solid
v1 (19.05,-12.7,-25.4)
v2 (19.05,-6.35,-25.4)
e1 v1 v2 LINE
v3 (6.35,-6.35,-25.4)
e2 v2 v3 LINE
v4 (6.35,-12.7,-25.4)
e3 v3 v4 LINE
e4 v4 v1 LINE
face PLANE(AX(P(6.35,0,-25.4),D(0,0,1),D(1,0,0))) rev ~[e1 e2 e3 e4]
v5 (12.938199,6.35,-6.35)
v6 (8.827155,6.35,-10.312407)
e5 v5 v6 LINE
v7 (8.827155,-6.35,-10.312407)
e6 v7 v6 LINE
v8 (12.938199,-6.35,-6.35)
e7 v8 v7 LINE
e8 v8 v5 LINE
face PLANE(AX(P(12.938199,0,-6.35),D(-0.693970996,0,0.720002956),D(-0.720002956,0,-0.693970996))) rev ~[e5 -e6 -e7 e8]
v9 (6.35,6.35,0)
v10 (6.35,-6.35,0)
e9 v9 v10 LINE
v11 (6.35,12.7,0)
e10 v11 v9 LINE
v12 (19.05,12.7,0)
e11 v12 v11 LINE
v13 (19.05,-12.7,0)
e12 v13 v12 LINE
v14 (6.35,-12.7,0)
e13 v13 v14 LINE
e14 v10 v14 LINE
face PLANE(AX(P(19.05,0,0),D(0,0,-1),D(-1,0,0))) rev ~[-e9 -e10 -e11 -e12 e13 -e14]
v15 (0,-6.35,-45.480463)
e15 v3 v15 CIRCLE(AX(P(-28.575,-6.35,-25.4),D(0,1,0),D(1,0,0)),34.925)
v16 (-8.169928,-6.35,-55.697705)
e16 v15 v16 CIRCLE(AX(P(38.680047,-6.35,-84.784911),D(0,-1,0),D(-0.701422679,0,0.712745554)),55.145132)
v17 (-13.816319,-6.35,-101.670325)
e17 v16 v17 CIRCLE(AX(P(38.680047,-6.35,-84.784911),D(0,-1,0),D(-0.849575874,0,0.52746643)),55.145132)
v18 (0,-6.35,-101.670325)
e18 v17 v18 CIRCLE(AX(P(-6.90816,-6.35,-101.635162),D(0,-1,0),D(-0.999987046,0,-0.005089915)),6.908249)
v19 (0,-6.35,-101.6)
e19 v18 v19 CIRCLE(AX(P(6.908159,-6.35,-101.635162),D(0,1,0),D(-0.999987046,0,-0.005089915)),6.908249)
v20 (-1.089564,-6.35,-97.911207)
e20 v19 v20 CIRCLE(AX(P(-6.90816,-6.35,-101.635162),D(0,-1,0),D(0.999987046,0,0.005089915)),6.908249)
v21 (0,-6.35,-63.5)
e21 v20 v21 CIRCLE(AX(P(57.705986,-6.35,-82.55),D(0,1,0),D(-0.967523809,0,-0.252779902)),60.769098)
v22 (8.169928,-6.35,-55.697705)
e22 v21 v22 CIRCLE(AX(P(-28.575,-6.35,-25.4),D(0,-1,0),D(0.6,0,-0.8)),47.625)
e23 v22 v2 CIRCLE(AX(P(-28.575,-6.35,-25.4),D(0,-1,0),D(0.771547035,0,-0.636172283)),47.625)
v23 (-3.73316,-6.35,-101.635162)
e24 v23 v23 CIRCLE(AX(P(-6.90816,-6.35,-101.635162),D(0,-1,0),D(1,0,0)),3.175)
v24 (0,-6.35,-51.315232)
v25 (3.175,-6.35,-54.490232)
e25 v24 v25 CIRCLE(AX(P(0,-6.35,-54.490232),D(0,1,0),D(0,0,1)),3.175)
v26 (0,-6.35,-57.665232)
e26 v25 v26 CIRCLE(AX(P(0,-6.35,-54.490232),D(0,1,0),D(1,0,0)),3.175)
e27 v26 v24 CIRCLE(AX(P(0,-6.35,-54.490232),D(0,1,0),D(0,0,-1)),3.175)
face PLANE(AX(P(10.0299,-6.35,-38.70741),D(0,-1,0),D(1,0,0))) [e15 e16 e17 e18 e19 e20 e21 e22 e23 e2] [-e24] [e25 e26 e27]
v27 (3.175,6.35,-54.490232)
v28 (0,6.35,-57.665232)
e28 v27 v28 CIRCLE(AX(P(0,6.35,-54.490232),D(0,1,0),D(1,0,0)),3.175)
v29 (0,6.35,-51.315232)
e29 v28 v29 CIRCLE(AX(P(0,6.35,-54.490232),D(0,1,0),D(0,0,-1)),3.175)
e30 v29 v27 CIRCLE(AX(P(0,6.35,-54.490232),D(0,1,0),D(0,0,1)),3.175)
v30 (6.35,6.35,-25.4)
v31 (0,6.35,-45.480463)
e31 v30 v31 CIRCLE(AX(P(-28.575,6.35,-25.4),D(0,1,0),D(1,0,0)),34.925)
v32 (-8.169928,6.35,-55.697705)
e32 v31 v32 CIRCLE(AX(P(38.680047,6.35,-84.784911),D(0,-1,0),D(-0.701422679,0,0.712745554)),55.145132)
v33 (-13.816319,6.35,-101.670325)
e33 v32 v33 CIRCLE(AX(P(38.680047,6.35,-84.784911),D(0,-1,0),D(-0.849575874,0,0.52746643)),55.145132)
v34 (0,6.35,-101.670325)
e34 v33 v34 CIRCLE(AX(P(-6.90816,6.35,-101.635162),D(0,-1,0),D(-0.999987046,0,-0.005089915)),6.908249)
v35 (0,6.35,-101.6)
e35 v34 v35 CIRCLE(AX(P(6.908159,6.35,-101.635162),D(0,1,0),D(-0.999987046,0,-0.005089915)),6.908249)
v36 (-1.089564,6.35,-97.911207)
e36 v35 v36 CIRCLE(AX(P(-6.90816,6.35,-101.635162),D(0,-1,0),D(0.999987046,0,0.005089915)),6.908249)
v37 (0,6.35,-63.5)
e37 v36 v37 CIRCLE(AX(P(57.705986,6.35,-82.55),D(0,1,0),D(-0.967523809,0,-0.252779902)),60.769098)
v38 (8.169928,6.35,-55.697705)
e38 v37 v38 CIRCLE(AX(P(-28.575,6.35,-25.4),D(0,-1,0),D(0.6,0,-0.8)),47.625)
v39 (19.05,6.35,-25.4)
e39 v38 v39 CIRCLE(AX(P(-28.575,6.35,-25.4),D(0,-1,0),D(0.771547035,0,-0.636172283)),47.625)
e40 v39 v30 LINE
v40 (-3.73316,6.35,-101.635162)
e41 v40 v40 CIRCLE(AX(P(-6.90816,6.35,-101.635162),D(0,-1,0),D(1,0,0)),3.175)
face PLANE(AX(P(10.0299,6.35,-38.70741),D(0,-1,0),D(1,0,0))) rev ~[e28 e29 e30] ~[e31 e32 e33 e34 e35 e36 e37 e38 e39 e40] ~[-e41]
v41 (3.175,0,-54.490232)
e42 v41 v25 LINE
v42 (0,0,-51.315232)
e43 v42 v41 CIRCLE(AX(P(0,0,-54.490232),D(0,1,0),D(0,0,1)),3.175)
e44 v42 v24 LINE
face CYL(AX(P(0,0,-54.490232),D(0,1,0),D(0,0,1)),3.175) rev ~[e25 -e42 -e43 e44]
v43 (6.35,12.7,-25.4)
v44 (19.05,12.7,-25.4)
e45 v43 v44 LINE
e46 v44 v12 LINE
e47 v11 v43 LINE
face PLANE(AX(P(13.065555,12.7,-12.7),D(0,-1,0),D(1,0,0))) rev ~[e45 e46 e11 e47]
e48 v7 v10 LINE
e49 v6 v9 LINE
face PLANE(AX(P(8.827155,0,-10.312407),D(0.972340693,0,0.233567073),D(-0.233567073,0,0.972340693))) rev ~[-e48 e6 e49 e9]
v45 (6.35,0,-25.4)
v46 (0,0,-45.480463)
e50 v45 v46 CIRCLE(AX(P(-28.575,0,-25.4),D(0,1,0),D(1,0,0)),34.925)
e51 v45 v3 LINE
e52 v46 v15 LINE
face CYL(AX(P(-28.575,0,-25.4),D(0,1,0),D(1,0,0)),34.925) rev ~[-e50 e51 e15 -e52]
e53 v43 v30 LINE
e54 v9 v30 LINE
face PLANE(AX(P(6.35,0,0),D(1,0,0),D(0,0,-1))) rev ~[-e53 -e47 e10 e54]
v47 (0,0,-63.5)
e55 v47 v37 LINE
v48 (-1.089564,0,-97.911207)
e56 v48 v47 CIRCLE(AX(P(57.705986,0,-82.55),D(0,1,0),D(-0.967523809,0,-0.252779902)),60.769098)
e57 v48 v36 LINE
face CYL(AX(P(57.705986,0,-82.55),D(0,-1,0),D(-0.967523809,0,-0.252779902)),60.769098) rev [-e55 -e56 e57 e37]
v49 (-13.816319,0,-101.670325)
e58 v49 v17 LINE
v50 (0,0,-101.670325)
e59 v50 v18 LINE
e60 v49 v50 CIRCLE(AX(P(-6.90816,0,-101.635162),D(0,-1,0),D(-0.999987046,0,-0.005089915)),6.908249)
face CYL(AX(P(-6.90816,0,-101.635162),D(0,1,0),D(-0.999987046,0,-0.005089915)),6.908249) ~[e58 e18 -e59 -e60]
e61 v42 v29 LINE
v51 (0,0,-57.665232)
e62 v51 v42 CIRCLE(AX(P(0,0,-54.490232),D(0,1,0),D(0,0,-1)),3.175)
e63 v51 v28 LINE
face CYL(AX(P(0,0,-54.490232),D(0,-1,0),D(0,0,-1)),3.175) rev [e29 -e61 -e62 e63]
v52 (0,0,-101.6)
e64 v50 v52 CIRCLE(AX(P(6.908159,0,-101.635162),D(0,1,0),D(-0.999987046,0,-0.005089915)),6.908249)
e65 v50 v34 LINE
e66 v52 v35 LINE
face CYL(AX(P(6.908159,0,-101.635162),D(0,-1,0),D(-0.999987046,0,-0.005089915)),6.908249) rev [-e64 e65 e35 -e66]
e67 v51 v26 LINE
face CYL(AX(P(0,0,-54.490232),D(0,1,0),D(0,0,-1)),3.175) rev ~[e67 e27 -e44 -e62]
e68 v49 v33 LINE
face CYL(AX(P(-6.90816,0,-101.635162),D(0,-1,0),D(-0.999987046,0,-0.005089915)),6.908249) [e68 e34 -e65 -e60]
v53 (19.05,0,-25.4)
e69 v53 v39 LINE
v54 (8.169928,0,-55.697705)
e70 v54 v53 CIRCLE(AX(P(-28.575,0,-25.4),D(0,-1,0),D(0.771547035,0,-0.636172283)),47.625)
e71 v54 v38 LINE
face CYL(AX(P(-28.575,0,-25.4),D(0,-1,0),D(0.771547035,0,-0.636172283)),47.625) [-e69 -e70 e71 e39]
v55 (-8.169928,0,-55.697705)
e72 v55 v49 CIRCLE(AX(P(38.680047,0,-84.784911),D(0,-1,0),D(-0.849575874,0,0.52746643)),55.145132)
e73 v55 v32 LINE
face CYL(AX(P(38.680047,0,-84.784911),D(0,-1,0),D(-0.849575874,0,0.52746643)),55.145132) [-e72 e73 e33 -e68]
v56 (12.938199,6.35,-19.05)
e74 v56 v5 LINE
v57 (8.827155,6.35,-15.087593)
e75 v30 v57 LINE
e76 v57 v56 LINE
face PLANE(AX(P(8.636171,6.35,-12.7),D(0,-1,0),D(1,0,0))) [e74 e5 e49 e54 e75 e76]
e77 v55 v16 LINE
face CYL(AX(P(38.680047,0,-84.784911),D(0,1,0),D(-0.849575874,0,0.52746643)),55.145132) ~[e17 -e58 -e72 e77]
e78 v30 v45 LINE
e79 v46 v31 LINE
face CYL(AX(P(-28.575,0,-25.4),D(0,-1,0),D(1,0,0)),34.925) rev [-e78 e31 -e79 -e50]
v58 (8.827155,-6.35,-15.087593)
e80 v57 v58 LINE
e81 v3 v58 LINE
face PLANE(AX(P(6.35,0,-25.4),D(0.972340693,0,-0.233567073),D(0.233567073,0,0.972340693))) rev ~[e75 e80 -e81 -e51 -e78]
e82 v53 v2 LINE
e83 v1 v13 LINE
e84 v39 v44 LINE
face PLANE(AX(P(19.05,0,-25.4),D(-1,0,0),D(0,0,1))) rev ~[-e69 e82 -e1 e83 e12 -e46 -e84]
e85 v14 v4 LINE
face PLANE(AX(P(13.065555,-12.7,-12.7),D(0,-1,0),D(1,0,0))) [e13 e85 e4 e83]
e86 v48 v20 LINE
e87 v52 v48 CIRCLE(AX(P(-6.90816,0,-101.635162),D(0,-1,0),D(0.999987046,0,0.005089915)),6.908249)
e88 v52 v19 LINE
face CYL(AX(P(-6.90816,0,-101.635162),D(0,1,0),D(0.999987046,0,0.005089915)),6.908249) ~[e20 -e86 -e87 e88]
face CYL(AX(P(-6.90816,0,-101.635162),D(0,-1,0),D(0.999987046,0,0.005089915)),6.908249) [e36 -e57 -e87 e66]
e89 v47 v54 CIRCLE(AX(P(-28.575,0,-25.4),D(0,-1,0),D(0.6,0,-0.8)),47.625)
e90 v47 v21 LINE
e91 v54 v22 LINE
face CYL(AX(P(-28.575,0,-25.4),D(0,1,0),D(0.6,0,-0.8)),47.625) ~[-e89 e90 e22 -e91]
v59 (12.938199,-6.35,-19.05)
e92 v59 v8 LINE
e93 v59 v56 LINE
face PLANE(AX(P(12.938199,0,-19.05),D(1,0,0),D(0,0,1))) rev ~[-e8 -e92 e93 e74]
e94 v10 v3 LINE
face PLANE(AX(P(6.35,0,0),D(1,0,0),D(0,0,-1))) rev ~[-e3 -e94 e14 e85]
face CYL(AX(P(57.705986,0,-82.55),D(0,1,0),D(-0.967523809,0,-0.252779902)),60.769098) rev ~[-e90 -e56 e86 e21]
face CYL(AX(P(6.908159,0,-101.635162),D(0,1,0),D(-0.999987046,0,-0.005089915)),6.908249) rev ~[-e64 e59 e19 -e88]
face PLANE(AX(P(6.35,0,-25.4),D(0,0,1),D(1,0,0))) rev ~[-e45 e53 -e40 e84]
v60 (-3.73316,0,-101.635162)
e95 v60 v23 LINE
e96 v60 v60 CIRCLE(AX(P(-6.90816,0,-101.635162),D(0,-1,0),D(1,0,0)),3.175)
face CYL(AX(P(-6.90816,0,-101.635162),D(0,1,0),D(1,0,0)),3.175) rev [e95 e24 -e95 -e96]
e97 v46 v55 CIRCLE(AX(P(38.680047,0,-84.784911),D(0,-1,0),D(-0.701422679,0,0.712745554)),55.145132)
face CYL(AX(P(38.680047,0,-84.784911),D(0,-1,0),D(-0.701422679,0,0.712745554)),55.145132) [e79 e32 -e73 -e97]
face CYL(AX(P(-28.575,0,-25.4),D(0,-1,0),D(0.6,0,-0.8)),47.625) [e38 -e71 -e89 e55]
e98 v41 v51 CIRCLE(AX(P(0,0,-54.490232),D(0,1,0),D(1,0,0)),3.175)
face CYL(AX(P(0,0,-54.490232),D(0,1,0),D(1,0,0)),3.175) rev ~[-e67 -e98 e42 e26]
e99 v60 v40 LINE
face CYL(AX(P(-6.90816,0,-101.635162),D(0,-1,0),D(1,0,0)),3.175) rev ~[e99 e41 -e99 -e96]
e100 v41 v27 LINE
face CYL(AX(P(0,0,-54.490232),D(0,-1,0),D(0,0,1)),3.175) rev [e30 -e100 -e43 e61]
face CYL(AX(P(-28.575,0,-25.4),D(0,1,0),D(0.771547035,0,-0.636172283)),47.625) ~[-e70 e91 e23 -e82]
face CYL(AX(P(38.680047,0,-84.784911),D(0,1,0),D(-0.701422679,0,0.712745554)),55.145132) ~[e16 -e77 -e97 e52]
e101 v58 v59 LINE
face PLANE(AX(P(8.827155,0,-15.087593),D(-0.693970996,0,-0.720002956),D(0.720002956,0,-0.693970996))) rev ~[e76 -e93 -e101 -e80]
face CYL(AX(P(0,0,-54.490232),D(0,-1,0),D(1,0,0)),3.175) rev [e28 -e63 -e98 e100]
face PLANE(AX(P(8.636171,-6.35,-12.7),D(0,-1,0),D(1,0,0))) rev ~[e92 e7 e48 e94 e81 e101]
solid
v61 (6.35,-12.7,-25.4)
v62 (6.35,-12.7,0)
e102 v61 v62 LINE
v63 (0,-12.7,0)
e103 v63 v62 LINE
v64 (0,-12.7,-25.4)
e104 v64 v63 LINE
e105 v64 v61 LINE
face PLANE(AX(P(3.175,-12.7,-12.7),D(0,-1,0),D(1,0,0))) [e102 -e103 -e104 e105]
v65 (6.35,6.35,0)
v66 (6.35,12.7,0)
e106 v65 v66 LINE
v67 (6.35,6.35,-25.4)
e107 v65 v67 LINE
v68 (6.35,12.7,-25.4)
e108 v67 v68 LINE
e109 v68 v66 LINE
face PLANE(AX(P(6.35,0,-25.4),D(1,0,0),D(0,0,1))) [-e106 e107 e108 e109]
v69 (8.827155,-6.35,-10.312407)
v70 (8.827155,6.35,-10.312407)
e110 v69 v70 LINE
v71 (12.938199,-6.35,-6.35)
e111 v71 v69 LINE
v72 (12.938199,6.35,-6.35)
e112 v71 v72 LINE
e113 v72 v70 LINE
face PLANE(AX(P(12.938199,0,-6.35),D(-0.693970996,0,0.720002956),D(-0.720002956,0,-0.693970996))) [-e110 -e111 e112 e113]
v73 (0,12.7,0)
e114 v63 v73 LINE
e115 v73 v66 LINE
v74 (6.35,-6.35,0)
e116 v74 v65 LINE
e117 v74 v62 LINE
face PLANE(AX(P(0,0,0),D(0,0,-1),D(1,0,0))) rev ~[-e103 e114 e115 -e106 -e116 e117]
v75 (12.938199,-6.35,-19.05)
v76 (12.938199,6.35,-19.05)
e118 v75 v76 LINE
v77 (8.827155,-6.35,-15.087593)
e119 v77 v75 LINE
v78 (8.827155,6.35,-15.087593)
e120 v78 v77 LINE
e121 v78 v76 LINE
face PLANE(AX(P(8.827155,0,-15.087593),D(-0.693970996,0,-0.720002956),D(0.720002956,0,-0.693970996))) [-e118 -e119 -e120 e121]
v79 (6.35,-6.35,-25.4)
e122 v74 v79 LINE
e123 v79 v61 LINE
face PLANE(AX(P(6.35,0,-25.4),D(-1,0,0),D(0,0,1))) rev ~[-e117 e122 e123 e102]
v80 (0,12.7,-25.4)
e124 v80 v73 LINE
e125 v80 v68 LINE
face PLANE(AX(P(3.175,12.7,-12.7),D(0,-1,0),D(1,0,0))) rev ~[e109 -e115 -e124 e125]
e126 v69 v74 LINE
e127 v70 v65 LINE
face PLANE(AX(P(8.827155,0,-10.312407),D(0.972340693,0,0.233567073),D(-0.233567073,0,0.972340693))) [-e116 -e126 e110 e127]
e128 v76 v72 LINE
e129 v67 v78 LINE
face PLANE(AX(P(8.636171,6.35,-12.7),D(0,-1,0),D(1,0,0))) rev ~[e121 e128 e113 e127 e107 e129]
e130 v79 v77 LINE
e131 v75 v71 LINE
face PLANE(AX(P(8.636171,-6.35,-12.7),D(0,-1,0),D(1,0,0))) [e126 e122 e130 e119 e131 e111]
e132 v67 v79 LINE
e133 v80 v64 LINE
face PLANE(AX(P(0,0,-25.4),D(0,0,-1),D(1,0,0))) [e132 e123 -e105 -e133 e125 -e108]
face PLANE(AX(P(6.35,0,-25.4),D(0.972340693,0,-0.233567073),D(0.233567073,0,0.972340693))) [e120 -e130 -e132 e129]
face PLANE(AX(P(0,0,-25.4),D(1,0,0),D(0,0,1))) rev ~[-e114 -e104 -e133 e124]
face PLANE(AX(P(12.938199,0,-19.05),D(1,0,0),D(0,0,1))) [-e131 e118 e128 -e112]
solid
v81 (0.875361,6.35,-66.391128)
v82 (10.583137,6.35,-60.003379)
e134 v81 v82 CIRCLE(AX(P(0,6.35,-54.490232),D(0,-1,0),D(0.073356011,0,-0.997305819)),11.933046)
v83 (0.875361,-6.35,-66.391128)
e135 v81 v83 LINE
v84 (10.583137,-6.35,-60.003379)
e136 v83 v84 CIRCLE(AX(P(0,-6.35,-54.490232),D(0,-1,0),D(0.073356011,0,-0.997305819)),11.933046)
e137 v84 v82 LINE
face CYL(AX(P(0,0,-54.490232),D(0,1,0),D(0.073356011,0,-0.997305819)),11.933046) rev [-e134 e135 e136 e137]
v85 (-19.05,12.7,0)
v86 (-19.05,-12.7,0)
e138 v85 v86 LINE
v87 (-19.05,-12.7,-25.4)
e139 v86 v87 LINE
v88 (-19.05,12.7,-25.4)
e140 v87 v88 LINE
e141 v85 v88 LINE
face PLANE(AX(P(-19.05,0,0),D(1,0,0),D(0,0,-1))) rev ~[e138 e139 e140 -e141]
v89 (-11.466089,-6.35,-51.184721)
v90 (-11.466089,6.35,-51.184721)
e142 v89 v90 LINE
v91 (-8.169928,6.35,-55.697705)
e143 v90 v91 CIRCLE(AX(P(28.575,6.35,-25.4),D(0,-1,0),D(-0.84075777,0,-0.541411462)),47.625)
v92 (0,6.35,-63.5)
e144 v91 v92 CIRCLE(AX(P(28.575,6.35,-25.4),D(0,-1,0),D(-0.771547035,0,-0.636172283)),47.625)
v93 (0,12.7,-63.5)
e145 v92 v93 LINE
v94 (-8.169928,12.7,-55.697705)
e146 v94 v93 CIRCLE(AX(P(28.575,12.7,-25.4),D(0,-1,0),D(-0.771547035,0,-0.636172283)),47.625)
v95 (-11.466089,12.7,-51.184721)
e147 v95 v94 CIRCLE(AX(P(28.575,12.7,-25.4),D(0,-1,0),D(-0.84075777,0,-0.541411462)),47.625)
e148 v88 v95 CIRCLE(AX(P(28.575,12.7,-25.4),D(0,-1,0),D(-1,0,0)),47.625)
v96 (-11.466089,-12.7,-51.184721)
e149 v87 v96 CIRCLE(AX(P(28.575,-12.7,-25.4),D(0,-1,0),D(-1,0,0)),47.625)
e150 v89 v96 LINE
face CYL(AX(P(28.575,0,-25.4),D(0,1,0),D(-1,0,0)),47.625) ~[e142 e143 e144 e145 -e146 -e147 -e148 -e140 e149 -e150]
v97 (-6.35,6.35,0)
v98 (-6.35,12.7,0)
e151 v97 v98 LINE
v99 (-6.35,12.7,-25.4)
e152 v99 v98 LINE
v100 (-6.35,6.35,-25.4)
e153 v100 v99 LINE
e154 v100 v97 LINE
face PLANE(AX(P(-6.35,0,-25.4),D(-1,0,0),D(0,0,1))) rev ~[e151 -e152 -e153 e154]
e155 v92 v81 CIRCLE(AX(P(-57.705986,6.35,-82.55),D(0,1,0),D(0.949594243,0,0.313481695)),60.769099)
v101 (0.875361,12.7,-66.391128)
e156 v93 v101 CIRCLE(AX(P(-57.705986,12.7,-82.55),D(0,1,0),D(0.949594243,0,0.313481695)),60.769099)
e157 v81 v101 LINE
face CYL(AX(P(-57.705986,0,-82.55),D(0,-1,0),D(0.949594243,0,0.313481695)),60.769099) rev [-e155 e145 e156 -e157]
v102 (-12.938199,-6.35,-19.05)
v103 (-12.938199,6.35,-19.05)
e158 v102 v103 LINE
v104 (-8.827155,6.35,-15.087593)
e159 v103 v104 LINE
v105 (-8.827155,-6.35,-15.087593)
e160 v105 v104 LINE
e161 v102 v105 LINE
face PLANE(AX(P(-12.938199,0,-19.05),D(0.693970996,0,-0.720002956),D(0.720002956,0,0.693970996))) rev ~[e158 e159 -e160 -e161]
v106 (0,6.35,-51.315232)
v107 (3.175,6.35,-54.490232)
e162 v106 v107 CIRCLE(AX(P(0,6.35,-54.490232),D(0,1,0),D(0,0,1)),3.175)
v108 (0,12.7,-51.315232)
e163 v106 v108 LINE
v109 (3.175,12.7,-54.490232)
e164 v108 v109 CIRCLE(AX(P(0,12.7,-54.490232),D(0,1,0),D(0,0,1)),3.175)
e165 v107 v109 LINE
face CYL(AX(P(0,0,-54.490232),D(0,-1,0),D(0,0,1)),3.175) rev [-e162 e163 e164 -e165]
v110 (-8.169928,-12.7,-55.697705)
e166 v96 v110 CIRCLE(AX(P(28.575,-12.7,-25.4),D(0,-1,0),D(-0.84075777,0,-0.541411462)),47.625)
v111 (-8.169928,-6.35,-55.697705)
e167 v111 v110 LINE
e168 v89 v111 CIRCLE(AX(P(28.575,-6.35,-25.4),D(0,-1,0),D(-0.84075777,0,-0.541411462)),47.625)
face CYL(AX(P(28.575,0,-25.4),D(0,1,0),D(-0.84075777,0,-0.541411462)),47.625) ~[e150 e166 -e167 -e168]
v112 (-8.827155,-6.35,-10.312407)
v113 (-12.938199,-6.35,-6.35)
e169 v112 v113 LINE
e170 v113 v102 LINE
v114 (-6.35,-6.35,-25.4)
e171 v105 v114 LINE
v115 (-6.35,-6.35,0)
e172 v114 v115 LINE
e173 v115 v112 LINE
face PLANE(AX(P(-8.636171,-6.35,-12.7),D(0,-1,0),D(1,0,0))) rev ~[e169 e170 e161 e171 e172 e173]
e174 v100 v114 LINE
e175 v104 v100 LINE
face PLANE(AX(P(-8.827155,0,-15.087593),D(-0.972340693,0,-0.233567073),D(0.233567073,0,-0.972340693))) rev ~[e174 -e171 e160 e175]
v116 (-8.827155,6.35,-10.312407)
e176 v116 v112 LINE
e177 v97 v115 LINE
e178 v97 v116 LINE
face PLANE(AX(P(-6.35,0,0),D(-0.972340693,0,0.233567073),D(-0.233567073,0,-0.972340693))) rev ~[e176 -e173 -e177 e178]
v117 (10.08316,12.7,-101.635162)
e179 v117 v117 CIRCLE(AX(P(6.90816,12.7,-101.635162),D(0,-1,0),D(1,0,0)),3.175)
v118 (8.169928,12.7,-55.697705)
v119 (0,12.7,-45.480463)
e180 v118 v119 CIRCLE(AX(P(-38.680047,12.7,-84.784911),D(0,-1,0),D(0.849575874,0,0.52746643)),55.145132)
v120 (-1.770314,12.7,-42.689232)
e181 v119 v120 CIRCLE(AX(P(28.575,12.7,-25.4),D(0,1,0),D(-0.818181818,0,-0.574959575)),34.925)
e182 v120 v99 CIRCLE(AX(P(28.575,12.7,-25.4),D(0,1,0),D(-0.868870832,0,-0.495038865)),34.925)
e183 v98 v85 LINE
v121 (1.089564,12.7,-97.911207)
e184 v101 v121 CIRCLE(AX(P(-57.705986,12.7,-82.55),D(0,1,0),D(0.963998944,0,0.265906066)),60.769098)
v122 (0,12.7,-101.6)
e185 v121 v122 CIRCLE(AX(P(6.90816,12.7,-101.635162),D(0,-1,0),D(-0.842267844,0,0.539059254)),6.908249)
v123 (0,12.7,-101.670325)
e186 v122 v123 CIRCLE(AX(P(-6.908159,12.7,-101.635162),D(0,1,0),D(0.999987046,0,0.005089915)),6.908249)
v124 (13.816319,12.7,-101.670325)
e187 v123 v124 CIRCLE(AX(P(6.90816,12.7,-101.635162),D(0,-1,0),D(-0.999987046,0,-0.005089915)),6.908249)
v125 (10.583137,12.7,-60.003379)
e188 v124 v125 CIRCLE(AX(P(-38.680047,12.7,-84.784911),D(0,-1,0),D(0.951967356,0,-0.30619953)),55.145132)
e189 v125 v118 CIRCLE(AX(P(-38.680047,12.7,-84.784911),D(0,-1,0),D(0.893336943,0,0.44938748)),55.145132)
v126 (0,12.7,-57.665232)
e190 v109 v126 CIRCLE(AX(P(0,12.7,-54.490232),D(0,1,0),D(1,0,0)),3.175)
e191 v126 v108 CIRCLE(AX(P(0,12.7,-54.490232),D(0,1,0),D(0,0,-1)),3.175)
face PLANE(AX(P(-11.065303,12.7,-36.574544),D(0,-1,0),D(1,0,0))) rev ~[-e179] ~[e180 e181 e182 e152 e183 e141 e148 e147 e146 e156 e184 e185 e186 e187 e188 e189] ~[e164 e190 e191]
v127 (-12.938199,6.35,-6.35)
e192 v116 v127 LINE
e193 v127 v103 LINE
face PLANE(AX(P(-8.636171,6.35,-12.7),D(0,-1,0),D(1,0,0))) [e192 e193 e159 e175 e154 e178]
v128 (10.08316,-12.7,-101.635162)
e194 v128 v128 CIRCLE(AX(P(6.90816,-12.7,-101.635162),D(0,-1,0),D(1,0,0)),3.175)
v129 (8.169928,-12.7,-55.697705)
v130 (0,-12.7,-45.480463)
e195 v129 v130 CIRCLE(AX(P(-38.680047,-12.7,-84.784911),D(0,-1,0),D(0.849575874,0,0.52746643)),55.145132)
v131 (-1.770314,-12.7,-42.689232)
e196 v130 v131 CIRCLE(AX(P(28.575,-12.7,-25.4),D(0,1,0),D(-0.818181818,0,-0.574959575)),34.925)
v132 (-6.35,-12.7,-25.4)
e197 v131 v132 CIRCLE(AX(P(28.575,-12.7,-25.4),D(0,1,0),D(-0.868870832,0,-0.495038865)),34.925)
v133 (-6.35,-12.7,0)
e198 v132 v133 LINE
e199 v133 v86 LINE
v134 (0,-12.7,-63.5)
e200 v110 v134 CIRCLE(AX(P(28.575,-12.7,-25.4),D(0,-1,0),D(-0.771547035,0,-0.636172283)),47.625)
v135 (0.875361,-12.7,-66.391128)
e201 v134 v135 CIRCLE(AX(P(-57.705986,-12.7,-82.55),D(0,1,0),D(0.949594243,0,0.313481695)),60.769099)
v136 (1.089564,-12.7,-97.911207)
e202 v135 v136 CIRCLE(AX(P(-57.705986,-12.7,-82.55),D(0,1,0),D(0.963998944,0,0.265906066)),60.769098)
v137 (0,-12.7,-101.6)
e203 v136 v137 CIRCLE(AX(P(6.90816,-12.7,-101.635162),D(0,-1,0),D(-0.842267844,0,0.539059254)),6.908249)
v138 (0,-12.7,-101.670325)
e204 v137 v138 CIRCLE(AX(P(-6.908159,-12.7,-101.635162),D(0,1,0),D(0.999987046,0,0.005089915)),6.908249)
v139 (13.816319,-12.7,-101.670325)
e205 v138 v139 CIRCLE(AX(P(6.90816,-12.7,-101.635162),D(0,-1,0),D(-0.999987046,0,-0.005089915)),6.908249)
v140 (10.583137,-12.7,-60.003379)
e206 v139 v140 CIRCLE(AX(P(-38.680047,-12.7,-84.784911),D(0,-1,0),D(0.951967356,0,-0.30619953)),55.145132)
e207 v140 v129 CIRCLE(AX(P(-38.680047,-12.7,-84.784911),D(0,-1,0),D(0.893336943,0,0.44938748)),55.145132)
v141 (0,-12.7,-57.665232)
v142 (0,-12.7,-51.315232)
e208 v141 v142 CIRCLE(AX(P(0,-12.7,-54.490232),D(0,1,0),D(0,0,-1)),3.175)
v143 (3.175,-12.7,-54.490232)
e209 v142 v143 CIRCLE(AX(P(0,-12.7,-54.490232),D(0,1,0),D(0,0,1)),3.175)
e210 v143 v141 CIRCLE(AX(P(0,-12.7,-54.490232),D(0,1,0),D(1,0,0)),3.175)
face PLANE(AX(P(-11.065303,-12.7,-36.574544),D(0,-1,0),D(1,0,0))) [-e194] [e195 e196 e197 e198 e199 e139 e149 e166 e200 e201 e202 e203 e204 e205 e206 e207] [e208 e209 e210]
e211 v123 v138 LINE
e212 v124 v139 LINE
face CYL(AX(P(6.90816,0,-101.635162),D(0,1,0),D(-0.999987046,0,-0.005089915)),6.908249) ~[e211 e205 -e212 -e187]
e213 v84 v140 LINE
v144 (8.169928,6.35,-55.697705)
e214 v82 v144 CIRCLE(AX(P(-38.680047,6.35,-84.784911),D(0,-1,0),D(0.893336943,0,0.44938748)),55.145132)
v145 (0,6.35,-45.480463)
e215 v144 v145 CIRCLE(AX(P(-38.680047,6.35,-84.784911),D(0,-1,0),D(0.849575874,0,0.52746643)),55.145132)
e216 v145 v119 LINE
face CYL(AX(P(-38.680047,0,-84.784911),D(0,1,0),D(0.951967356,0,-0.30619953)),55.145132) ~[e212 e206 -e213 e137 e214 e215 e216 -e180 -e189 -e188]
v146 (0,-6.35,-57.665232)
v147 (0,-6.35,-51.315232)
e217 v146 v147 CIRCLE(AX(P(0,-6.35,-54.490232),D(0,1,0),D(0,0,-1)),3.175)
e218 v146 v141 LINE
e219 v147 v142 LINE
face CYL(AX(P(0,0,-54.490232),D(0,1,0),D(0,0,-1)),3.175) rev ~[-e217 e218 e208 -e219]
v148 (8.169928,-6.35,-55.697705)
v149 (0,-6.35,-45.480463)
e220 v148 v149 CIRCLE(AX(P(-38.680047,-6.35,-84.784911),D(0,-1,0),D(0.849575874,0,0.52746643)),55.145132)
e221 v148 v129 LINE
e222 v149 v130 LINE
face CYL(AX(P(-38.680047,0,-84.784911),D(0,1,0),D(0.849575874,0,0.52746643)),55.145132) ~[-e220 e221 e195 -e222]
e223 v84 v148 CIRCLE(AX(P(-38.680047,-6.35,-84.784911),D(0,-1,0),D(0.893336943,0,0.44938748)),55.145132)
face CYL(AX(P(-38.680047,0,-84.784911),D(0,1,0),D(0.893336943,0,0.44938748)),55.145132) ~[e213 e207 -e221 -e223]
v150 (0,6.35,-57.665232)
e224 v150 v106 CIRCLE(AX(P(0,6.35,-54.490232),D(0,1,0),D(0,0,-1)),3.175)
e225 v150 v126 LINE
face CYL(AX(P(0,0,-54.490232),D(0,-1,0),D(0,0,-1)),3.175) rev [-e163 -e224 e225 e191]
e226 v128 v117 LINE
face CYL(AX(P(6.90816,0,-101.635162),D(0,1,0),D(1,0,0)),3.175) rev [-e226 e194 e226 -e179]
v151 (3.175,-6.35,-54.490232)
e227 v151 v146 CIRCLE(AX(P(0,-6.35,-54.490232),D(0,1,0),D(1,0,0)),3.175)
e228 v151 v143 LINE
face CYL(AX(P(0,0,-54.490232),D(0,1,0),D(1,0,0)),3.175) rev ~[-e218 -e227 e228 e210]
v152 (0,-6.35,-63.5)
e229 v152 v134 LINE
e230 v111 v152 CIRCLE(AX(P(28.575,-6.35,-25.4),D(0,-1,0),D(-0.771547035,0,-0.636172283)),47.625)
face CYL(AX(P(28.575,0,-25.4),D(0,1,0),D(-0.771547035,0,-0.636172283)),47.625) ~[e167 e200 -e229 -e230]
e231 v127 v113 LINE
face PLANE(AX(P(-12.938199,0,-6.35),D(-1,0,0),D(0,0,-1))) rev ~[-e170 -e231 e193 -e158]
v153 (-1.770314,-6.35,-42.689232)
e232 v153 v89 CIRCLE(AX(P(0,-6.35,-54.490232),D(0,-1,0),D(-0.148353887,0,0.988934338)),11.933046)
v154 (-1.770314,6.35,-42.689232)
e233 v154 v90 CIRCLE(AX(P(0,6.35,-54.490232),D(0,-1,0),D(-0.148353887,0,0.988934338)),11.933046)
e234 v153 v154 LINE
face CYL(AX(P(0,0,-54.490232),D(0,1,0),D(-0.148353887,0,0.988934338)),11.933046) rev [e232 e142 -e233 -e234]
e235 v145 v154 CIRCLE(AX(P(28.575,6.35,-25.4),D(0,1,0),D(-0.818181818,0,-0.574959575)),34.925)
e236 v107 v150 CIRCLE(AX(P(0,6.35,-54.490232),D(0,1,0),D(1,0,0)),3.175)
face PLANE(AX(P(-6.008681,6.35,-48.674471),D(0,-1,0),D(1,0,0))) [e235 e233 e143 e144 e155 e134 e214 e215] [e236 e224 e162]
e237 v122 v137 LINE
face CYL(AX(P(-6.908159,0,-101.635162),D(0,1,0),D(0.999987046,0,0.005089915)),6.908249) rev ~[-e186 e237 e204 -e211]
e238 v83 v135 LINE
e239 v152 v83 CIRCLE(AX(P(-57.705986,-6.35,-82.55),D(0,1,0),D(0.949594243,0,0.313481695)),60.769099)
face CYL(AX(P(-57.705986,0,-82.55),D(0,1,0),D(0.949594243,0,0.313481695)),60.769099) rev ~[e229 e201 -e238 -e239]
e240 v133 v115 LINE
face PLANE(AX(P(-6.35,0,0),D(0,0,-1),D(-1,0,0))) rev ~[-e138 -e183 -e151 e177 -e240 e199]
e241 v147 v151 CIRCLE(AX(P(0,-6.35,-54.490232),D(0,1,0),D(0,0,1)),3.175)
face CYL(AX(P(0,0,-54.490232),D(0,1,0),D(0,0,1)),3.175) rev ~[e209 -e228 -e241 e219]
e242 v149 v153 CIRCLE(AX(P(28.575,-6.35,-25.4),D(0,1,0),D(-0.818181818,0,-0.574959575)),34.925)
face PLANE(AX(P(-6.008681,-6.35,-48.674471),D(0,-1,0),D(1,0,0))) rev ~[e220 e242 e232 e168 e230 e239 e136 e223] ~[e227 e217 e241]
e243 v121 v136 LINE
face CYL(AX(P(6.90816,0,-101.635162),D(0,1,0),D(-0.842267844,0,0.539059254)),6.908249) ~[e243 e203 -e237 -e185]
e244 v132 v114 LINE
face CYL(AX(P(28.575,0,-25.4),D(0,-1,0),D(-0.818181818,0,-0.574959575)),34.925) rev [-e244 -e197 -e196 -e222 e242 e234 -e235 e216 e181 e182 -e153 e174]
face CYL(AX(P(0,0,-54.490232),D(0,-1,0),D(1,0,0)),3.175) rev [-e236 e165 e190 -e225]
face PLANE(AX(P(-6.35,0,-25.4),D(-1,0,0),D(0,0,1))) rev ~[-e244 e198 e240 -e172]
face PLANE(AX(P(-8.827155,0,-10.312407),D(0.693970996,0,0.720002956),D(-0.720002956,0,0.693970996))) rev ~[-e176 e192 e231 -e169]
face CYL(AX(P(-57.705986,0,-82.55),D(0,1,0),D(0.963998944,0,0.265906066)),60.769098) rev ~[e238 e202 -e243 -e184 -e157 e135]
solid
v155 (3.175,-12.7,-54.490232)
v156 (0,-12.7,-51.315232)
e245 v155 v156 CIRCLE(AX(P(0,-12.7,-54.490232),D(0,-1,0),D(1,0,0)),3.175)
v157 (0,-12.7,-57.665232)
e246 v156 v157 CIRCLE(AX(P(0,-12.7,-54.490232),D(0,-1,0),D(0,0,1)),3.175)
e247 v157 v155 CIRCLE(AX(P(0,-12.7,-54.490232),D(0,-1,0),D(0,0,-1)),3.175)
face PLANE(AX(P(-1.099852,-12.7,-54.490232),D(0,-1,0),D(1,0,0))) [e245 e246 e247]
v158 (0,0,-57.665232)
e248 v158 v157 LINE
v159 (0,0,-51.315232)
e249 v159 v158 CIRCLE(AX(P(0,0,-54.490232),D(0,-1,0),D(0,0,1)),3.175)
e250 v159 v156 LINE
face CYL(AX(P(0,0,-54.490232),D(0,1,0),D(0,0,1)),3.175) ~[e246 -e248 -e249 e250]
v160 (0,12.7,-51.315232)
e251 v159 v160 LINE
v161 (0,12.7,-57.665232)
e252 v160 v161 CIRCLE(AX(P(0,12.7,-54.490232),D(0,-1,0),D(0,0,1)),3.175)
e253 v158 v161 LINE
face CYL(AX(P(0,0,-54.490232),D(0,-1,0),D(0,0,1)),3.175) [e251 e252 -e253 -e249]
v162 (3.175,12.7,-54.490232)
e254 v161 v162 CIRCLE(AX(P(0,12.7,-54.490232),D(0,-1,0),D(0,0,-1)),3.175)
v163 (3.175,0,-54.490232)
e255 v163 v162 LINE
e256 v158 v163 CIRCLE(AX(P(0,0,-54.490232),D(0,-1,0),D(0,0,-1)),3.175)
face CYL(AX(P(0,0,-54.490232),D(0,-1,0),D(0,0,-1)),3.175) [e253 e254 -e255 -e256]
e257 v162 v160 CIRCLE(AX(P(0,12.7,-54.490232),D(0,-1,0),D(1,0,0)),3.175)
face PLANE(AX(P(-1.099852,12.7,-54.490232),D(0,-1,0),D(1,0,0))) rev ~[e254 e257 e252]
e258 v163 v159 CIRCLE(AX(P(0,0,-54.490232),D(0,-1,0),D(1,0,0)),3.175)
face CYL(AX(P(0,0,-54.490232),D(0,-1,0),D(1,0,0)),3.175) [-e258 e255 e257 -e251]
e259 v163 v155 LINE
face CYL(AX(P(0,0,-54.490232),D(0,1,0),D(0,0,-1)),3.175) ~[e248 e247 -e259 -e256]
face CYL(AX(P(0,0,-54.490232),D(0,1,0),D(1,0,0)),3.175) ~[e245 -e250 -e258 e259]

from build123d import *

# Parameters (mm, degrees)
F1_DEPTH      = 12.7
F1_DEPTH_BACK = 12.7
F2_DEPTH      = 6.35
F2_DEPTH_BACK = 6.35
F3_DEPTH      = 6.35
F3_DEPTH_BACK = 6.35
F0_W          = 6.35
F0_H          = 25.4
F4_DEPTH      = 12.7
F4_DEPTH_BACK = 12.7
F0_R          = 3.175
F5_DEPTH      = 6.35
F5_DEPTH_BACK = 6.35
F6_DEPTH      = 12.7
F6_DEPTH_BACK = 12.7
F7_DEPTH      = 6.35
F7_DEPTH_BACK = 6.35
F8_DEPTH      = 12.7
F8_DEPTH_BACK = 12.7


with BuildPart() as f1:
    # F0 (on Front) → F1 (new body, two sides)
    with BuildSketch(Plane.XZ) as f1_sk:
        Polygon((-8.827155169, -10.3124072454), (-6.35, 0), (-19.05, 0), (-19.05, -25.4), (-6.35, -25.4), (-8.827155169, -15.0875927546), (-12.9381986335, -19.05), (-12.9381986335, -12.7), (-12.9381986335, -6.35), align=None)
        Polygon((-6.35, -25.4), (-6.35, 0), (-8.827155169, -10.3124072454), (-12.9381986335, -6.35), (-12.9381986335, -12.7), (-12.9381986335, -19.05), (-8.827155169, -15.0875927546), align=None)
    extrude(amount=-F1_DEPTH)
    extrude(f1_sk.sketch, amount=F1_DEPTH_BACK)


with BuildPart() as f1b:
    # F0 (on Front) → F1, piece 2 (new body, two sides)
    with BuildSketch(Plane.XZ) as f1_2_sk:
        Polygon((19.05, 0), (6.35, 0), (8.827155169, -10.3124072454), (12.9381986335, -6.35), (12.9381986335, -12.7), (12.9381986335, -19.05), (8.827155169, -15.0875927546), (6.35, -25.4), (19.05, -25.4), align=None)
        Polygon((8.827155169, -10.3124072454), (6.35, 0), (6.35, -25.4), (8.827155169, -15.0875927546), (12.9381986335, -19.05), (12.9381986335, -12.7), (12.9381986335, -6.35), align=None)
    extrude(amount=-F1_DEPTH)
    extrude(f1_2_sk.sketch, amount=F1_DEPTH_BACK)


with BuildPart() as f2_tool:
    # F0 (on Front) → F2 (new body, two sides)
    with BuildSketch(Plane.XZ) as f2_sk:
        Polygon((8.827155169, -10.3124072454), (6.35, 0), (6.35, -25.4), (8.827155169, -15.0875927546), (12.9381986335, -19.05), (12.9381986335, -12.7), (12.9381986335, -6.35), align=None)
        Polygon((-6.35, -25.4), (-6.35, 0), (-8.827155169, -10.3124072454), (-12.9381986335, -6.35), (-12.9381986335, -12.7), (-12.9381986335, -19.05), (-8.827155169, -15.0875927546), align=None)
    extrude(amount=F2_DEPTH)
    extrude(f2_sk.sketch, amount=-F2_DEPTH_BACK)


with BuildPart() as f1_1:
    add(f1.part)

    # F2: cut by f2_tool
    add(f2_tool.part, mode=Mode.SUBTRACT)

    # F0 (on Front) → F6 (join, two sides)
    with BuildSketch(Plane.XZ) as f6_sk:
        with BuildLine():
            ThreePointArc((-1.7703138016, -42.6892323508), (-5.1856702357, -34.3427495905), (-6.35, -25.4))
            Line((-6.35, -25.4), (-19.05, -25.4))
            ThreePointArc((-19.05, -25.4), (-17.1147005889, -38.8384480167), (-11.4660888148, -51.1847208929))
            ThreePointArc((-11.4660888148, -51.1847208929), (-7.8640905354, -45.515061734), (-1.7703138016, -42.6892323508))
        make_face()
        with BuildLine():
            ThreePointArc((-8.1699275215, -55.6977049698), (-4.3890156004, -50.3459576296), (0, -45.4804631421))
            ThreePointArc((0, -45.4804631421), (-0.9181956043, -44.1058022562), (-1.7703138016, -42.6892323508))
            ThreePointArc((-1.7703138016, -42.6892323508), (-7.8640905354, -45.515061734), (-11.4660888148, -51.1847208929))
            ThreePointArc((-11.4660888148, -51.1847208929), (-9.8842619862, -53.4896029249), (-8.1699275215, -55.6977049698))
        make_face()
        with BuildLine():
            Line((0, -51.315231571), (0, -45.4804631421))
            ThreePointArc((0, -45.4804631421), (-4.3890156004, -50.3459576296), (-8.1699275215, -55.6977049698))
            ThreePointArc((-8.1699275215, -55.6977049698), (-4.3171295265, -59.8419575549), (0, -63.5))
            Line((0, -63.5), (0, -57.665231571))
            ThreePointArc((0, -57.665231571), (-3.175, -54.490231571), (0, -51.315231571))
        make_face()
        with BuildLine():
            ThreePointArc((8.1699275215, -55.6977049698), (4.3890156004, -50.3459576296), (0, -45.4804631421))
            Line((0, -45.4804631421), (0, -51.315231571))
            ThreePointArc((0, -51.315231571), (2.2450640303, -52.2451675408), (3.175, -54.490231571))
            ThreePointArc((3.175, -54.490231571), (2.2450640303, -56.7352956013), (0, -57.665231571))
            Line((0, -57.665231571), (0, -63.5))
            ThreePointArc((0, -63.5), (4.3171295265, -59.8419575549), (8.1699275215, -55.6977049698))
        make_face()
        with BuildLine():
            ThreePointArc((13.816319406, -101.6703248024), (16.2998142634, -80.5187022847), (10.5831374671, -60.0033790301))
            ThreePointArc((10.5831374671, -60.0033790301), (6.5593543364, -64.4588054029), (0.8753606705, -66.3911280603))
            ThreePointArc((0.8753606705, -66.3911280603), (3.0617092136, -82.1370373381), (1.0895635546, -97.9112067437))
            ThreePointArc((1.0895635546, -97.9112067437), (0.282876498, -99.6782440765), (0, -101.6))
            ThreePointArc((0, -101.6), (8.94874e-05, -101.6351624012), (0, -101.6703248024))
            ThreePointArc((0, -101.6703248024), (6.908159703, -108.5434115916), (13.816319406, -101.6703248024))
        make_face()
        with Locations((6.908159703, -101.6351624012)):
            Circle(F0_R, mode=Mode.SUBTRACT)
        with BuildLine():
            ThreePointArc((10.5831374671, -60.0033790301), (9.424729686, -57.8235288213), (8.1699275215, -55.6977049698))
            ThreePointArc((8.1699275215, -55.6977049698), (4.3171295265, -59.8419575549), (0, -63.5))
            ThreePointArc((0, -63.5), (0.4556473184, -64.9401240807), (0.8753606705, -66.3911280603))
            ThreePointArc((0.8753606705, -66.3911280603), (6.5593543364, -64.4588054029), (10.5831374671, -60.0033790301))
        make_face()
        with BuildLine():
            ThreePointArc((13.816319406, -101.6703248024), (16.2998142634, -80.5187022847), (10.5831374671, -60.0033790301))
            ThreePointArc((10.5831374671, -60.0033790301), (6.5593543364, -64.4588054029), (0.8753606705, -66.3911280603))
            ThreePointArc((0.8753606705, -66.3911280603), (3.0617092136, -82.1370373381), (1.0895635546, -97.9112067437))
            ThreePointArc((1.0895635546, -97.9112067437), (0.282876498, -99.6782440765), (0, -101.6))
            ThreePointArc((0, -101.6), (8.94874e-05, -101.6351624012), (0, -101.6703248024))
            ThreePointArc((0, -101.6703248024), (6.908159703, -108.5434115916), (13.816319406, -101.6703248024))
        make_face()
        with Locations((6.908159703, -101.6351624012)):
            Circle(F0_R, mode=Mode.SUBTRACT)
    extrude(amount=F6_DEPTH)
    extrude(f6_sk.sketch, amount=-F6_DEPTH_BACK)

    # F0 (on Front) → F7 (cut, two sides)
    with BuildSketch(Plane.XZ) as f7_sk:
        with BuildLine():
            ThreePointArc((-8.1699275215, -55.6977049698), (-4.3890156004, -50.3459576296), (0, -45.4804631421))
            ThreePointArc((0, -45.4804631421), (-0.9181956043, -44.1058022562), (-1.7703138016, -42.6892323508))
            ThreePointArc((-1.7703138016, -42.6892323508), (-7.8640905354, -45.515061734), (-11.4660888148, -51.1847208929))
            ThreePointArc((-11.4660888148, -51.1847208929), (-9.8842619862, -53.4896029249), (-8.1699275215, -55.6977049698))
        make_face()
        with BuildLine():
            Line((0, -51.315231571), (0, -45.4804631421))
            ThreePointArc((0, -45.4804631421), (-4.3890156004, -50.3459576296), (-8.1699275215, -55.6977049698))
            ThreePointArc((-8.1699275215, -55.6977049698), (-4.3171295265, -59.8419575549), (0, -63.5))
            Line((0, -63.5), (0, -57.665231571))
            ThreePointArc((0, -57.665231571), (-3.175, -54.490231571), (0, -51.315231571))
        make_face()
        with BuildLine():
            ThreePointArc((8.1699275215, -55.6977049698), (4.3890156004, -50.3459576296), (0, -45.4804631421))
            Line((0, -45.4804631421), (0, -51.315231571))
            ThreePointArc((0, -51.315231571), (2.2450640303, -52.2451675408), (3.175, -54.490231571))
            ThreePointArc((3.175, -54.490231571), (2.2450640303, -56.7352956013), (0, -57.665231571))
            Line((0, -57.665231571), (0, -63.5))
            ThreePointArc((0, -63.5), (4.3171295265, -59.8419575549), (8.1699275215, -55.6977049698))
        make_face()
        with BuildLine():
            ThreePointArc((10.5831374671, -60.0033790301), (9.424729686, -57.8235288213), (8.1699275215, -55.6977049698))
            ThreePointArc((8.1699275215, -55.6977049698), (4.3171295265, -59.8419575549), (0, -63.5))
            ThreePointArc((0, -63.5), (0.4556473184, -64.9401240807), (0.8753606705, -66.3911280603))
            ThreePointArc((0.8753606705, -66.3911280603), (6.5593543364, -64.4588054029), (10.5831374671, -60.0033790301))
        make_face()
    extrude(amount=F7_DEPTH, mode=Mode.SUBTRACT)
    extrude(f7_sk.sketch, amount=-F7_DEPTH_BACK, mode=Mode.SUBTRACT)


with BuildPart() as f1b_1:
    add(f1b.part)

    # F2: cut by f2_tool
    add(f2_tool.part, mode=Mode.SUBTRACT)

    # F0 (on Front) → F5 (join, two sides)
    with BuildSketch(Plane.XZ) as f5_sk:
        with BuildLine():
            Line((19.05, -25.4), (6.35, -25.4))
            ThreePointArc((6.35, -25.4), (4.7246809294, -35.9302837094), (0, -45.4804631421))
            ThreePointArc((0, -45.4804631421), (4.3890156004, -50.3459576296), (8.1699275215, -55.6977049698))
            ThreePointArc((8.1699275215, -55.6977049698), (16.2475266926, -41.4960158391), (19.05, -25.4))
        make_face()
        with BuildLine():
            ThreePointArc((8.1699275215, -55.6977049698), (4.3890156004, -50.3459576296), (0, -45.4804631421))
            Line((0, -45.4804631421), (0, -51.315231571))
            ThreePointArc((0, -51.315231571), (2.2450640303, -52.2451675408), (3.175, -54.490231571))
            ThreePointArc((3.175, -54.490231571), (2.2450640303, -56.7352956013), (0, -57.665231571))
            Line((0, -57.665231571), (0, -63.5))
            ThreePointArc((0, -63.5), (4.3171295265, -59.8419575549), (8.1699275215, -55.6977049698))
        make_face()
        with BuildLine():
            Line((0, -51.315231571), (0, -45.4804631421))
            ThreePointArc((0, -45.4804631421), (-4.3890156004, -50.3459576296), (-8.1699275215, -55.6977049698))
            ThreePointArc((-8.1699275215, -55.6977049698), (-4.3171295265, -59.8419575549), (0, -63.5))
            Line((0, -63.5), (0, -57.665231571))
            ThreePointArc((0, -57.665231571), (-3.175, -54.490231571), (0, -51.315231571))
        make_face()
        with BuildLine():
            ThreePointArc((0, -63.5), (-4.3171295265, -59.8419575549), (-8.1699275215, -55.6977049698))
            ThreePointArc((-8.1699275215, -55.6977049698), (-16.0538027814, -78.0624584307), (-13.816319406, -101.6703248024))
            ThreePointArc((-13.816319406, -101.6703248024), (-6.908159703, -108.5434115916), (0, -101.6703248024))
            ThreePointArc((0, -101.6703248024), (-8.94874e-05, -101.6351624012), (0, -101.6))
            ThreePointArc((0, -101.6), (-0.282876498, -99.6782440765), (-1.0895635546, -97.9112067437))
            ThreePointArc((-1.0895635546, -97.9112067437), (-3.0326733006, -80.626829153), (0, -63.5))
        make_face()
        with Locations((-6.908159703, -101.6351624012)):
            Circle(F0_R, mode=Mode.SUBTRACT)
    extrude(amount=F5_DEPTH)
    extrude(f5_sk.sketch, amount=-F5_DEPTH_BACK)


with BuildPart() as f3:
    # F0 (on Front) → F3 (new body, two sides)
    with BuildSketch(Plane.XZ) as f3_sk:
        Polygon((8.827155169, -10.3124072454), (6.35, 0), (6.35, -25.4), (8.827155169, -15.0875927546), (12.9381986335, -19.05), (12.9381986335, -12.7), (12.9381986335, -6.35), align=None)
    extrude(amount=F3_DEPTH)
    extrude(f3_sk.sketch, amount=-F3_DEPTH_BACK)

    # F0 (on Front) → F4 (join, two sides)
    with BuildSketch(Plane.XZ) as f4_sk:
        with Locations((3.175, -12.7)):
            Rectangle(F0_W, F0_H)
    extrude(amount=F4_DEPTH)
    extrude(f4_sk.sketch, amount=-F4_DEPTH_BACK)


with BuildPart() as f8:
    # F0 (on Front) → F8 (new body, two sides)
    with BuildSketch(Plane.XZ) as f8_sk:
        with BuildLine():
            Line((0, -57.665231571), (0, -51.315231571))
            ThreePointArc((0, -51.315231571), (-3.175, -54.490231571), (0, -57.665231571))
        make_face()
        with BuildLine():
            ThreePointArc((3.175, -54.490231571), (2.2450640303, -52.2451675408), (0, -51.315231571))
            Line((0, -51.315231571), (0, -57.665231571))
            ThreePointArc((0, -57.665231571), (2.2450640303, -56.7352956013), (3.175, -54.490231571))
        make_face()
    extrude(amount=F8_DEPTH)
    extrude(f8_sk.sketch, amount=-F8_DEPTH_BACK)


solid = Compound([f1_1.part, f1b_1.part, f3.part, f8.part])
